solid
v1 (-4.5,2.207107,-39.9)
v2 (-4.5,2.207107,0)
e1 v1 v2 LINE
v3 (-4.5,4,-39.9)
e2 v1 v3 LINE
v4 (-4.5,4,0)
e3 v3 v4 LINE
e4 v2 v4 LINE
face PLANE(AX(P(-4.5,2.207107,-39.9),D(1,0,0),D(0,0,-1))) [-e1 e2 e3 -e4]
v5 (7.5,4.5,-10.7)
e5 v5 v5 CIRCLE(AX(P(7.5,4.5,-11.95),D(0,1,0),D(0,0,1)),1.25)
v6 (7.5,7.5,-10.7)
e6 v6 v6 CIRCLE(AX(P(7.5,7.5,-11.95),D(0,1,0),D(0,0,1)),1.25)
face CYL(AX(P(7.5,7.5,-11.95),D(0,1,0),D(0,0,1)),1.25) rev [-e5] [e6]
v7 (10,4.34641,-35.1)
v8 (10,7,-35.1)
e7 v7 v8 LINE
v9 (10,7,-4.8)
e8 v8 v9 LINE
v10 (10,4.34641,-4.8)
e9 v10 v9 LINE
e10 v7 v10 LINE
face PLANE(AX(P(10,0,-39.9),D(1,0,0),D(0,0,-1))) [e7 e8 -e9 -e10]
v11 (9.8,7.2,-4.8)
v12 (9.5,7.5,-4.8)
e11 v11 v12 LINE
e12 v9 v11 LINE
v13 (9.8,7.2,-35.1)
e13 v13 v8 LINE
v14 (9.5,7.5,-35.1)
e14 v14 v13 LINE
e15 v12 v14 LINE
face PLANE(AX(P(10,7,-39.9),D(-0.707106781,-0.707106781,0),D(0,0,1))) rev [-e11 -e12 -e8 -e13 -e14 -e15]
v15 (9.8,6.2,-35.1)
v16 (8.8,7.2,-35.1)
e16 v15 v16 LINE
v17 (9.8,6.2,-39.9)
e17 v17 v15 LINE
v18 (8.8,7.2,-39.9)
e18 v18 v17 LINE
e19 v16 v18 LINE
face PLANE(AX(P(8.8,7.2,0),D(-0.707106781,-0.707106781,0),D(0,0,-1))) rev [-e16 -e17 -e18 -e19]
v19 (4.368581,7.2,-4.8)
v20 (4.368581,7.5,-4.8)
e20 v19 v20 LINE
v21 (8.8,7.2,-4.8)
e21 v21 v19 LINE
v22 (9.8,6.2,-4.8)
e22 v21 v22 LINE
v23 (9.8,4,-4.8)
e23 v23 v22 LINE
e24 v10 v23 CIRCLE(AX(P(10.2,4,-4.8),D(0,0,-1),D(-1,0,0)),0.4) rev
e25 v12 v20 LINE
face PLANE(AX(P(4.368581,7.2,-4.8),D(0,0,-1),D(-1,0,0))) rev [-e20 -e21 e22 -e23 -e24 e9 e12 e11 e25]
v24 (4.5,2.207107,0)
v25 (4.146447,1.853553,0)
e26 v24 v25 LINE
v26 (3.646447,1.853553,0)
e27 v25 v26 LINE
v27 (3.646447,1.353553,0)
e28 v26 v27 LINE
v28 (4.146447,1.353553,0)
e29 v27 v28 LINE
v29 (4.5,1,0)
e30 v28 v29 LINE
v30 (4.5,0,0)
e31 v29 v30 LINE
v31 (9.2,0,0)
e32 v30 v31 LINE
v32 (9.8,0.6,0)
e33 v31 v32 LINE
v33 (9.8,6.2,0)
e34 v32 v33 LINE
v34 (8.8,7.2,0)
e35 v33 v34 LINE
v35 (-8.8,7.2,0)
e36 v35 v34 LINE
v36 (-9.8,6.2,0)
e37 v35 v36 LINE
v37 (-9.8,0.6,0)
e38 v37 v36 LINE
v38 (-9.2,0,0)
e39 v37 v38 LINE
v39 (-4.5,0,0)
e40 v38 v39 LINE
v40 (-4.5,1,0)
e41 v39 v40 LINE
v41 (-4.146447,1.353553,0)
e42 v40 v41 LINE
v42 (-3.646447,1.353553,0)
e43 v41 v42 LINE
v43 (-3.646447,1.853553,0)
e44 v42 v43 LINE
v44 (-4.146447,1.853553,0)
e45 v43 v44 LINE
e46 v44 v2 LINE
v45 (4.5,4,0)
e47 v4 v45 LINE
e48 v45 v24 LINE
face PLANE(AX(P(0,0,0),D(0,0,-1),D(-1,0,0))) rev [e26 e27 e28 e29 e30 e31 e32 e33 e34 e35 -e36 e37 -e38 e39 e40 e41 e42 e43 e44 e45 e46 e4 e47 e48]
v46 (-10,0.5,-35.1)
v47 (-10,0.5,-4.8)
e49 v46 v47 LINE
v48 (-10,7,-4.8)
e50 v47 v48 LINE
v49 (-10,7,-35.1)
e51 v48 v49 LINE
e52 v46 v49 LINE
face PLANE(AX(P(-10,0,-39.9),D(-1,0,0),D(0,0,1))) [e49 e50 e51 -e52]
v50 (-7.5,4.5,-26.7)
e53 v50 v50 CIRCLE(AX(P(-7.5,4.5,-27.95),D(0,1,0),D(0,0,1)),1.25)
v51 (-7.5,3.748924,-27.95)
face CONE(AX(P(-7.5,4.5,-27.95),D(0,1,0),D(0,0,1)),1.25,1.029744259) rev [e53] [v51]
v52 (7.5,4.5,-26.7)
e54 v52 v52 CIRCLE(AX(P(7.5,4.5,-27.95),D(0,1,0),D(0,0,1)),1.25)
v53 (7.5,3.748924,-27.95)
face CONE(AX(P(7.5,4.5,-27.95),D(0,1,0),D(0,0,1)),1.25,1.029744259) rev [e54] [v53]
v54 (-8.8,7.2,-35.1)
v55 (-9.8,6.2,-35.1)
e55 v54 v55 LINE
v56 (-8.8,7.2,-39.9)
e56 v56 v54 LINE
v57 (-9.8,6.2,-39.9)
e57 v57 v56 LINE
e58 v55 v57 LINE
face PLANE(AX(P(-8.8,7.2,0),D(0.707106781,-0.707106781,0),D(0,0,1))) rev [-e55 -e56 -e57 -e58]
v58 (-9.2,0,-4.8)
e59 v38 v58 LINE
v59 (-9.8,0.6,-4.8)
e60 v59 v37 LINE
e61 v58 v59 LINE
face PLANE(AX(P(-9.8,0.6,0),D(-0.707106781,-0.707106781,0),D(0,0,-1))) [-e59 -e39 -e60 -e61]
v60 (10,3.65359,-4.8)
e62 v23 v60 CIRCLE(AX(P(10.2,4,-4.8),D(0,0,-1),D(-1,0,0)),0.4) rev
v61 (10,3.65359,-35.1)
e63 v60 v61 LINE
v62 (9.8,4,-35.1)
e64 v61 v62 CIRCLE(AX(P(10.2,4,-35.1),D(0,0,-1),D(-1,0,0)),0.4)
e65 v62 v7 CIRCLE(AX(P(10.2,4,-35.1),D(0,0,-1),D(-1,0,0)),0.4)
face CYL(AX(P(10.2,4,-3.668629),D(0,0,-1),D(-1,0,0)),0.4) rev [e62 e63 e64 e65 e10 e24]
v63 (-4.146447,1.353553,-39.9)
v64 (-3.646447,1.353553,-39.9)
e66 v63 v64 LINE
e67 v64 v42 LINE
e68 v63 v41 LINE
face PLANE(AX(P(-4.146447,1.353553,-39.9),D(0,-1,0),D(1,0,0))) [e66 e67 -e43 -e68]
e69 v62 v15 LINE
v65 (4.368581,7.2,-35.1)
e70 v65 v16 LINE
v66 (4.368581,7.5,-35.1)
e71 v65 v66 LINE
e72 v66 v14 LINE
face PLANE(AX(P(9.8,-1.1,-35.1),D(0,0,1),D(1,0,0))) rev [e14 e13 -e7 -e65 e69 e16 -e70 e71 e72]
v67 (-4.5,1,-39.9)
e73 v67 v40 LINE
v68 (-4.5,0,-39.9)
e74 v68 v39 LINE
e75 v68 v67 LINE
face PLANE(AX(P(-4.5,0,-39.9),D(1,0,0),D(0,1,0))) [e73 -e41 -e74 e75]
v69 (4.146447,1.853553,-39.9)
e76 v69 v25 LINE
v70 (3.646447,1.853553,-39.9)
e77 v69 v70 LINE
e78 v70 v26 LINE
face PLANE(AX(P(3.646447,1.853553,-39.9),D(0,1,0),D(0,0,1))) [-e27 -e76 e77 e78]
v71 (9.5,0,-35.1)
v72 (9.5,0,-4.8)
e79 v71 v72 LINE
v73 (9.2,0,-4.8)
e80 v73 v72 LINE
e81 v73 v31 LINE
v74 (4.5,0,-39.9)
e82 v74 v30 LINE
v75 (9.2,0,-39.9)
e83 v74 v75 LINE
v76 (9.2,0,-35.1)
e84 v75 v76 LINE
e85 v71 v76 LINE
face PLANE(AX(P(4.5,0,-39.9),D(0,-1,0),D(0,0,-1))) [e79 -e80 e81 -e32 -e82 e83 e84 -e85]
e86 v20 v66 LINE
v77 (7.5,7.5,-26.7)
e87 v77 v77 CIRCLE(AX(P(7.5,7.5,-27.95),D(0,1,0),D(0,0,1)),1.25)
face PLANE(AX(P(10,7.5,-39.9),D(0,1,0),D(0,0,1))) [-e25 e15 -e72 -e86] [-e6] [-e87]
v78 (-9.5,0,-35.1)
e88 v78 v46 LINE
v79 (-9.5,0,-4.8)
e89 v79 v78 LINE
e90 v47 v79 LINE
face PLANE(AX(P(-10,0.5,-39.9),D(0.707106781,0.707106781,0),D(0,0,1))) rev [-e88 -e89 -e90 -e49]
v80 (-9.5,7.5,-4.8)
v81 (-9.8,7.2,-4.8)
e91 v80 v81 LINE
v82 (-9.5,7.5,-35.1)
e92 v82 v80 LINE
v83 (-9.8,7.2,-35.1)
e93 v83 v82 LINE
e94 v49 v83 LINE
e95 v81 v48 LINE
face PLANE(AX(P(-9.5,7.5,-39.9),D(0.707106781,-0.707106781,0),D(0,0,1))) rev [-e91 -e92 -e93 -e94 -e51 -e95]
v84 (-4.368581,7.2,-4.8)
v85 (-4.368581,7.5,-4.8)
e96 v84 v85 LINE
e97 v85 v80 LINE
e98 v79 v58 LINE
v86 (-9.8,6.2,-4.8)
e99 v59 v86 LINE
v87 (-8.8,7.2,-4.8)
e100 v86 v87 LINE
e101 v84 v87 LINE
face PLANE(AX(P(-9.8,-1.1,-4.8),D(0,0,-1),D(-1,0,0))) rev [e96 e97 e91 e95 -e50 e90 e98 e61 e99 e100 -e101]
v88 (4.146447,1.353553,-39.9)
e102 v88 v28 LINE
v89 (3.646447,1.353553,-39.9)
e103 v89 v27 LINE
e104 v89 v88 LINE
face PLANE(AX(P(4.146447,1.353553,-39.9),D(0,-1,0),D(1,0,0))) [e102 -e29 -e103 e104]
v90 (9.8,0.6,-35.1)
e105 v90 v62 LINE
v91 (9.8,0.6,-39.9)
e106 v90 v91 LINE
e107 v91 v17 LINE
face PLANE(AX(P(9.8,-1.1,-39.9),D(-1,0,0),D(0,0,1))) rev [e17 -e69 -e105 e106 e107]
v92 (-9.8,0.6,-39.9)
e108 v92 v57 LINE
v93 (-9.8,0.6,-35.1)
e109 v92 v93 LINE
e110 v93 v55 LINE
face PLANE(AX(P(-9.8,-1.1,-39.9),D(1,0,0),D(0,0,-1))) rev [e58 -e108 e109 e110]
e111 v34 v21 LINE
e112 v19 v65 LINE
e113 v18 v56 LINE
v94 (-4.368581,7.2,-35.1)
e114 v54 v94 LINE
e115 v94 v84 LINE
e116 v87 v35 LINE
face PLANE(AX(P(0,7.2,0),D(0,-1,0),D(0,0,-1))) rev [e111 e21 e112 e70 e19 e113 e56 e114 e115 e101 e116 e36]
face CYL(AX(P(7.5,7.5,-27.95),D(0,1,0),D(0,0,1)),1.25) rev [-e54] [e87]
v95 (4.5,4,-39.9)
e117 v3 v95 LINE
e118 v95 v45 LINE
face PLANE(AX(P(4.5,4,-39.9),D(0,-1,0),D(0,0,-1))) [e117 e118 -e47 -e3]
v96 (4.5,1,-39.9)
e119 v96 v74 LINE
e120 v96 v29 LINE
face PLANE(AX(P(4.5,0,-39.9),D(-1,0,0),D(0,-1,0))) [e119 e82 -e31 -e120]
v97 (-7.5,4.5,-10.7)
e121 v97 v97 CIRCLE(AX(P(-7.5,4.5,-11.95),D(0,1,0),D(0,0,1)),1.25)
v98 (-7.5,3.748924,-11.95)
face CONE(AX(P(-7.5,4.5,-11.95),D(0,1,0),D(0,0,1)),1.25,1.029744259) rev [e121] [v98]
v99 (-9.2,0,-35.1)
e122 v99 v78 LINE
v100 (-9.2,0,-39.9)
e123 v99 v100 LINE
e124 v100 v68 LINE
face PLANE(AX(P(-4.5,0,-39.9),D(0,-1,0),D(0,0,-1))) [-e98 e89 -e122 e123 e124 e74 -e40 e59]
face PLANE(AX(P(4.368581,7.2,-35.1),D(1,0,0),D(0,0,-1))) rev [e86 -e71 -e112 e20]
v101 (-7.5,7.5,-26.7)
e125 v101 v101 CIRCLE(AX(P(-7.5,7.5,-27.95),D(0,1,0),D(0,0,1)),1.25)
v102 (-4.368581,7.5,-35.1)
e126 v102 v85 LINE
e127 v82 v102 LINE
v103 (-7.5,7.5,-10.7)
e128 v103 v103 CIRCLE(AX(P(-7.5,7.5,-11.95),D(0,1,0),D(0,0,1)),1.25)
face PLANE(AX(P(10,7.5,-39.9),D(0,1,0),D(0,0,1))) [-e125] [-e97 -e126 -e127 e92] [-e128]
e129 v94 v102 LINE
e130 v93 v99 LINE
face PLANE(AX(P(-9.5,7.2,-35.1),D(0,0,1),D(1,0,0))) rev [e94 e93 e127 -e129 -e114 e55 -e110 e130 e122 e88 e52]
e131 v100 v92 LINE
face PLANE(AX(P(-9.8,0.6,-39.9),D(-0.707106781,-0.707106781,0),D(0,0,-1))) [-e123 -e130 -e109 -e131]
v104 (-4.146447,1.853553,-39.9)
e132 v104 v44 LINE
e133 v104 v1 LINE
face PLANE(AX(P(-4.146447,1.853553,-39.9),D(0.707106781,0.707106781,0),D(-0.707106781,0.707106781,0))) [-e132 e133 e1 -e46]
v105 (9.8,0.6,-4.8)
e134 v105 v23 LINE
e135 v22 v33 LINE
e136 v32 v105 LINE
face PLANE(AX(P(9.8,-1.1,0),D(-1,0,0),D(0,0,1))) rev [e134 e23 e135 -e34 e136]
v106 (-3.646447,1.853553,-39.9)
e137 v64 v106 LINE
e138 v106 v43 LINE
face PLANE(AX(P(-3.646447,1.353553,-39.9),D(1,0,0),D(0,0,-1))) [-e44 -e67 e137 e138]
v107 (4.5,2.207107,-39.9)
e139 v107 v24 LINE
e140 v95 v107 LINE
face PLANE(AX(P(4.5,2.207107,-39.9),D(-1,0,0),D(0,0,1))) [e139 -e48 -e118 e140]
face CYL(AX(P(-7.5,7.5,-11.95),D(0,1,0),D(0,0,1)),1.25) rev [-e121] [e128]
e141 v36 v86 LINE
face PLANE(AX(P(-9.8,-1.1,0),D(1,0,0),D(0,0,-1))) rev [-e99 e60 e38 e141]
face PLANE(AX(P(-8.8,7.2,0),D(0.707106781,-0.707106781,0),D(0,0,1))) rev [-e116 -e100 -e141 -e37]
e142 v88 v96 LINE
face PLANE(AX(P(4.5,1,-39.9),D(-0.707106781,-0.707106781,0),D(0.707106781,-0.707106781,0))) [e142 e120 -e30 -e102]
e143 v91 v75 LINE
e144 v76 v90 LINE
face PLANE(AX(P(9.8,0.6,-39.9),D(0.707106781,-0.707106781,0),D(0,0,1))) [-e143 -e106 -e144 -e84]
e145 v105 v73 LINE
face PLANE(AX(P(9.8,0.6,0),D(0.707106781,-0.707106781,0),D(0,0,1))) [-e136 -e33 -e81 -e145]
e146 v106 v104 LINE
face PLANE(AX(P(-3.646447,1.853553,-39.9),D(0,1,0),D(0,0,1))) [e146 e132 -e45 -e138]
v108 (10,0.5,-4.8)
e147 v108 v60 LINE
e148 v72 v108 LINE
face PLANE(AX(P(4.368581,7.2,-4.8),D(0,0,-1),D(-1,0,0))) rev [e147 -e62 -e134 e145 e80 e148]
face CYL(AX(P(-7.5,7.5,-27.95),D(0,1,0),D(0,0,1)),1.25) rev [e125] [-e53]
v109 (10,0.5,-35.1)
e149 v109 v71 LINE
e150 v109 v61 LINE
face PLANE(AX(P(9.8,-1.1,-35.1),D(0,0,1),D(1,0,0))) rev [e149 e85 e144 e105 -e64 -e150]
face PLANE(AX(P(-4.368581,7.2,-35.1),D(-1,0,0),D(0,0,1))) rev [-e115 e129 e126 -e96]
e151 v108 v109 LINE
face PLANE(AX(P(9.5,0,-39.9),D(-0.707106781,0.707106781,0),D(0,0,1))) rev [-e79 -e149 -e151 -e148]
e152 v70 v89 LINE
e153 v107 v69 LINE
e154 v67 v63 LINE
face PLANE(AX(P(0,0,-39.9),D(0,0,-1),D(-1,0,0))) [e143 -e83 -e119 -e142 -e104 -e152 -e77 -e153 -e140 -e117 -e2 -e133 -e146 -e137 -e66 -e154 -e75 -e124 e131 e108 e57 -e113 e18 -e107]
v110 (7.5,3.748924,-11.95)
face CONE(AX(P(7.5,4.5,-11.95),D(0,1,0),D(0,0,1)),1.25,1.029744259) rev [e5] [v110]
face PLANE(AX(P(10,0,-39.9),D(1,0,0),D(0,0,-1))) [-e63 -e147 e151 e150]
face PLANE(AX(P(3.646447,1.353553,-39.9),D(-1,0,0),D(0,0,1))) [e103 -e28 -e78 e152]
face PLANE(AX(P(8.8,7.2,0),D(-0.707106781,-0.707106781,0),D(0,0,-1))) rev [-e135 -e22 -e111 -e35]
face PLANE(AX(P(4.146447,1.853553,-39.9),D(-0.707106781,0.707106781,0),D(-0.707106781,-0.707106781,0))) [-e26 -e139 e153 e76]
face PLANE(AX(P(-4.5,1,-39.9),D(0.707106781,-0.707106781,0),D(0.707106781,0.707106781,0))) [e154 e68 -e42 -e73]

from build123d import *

# Parameters (mm, degrees)
EXTRUDE_1_DEPTH     = 39.9
CHAMFER_1_SIZE      = 0.5
CUT_EXTRUDE_1_DEPTH = 0.3
SKETCH_6_W          = 0.2
SKETCH_6_H          = 4.8
CUT_EXTRUDE_2_DEPTH = 8.3
CHAMFER_2_SIZE      = 1
CHAMFER_3_SIZE      = 0.6
CHAMFER_4_SIZE      = 0.5
SKETCH_7_R          = 0.4
CUT_EXTRUDE_3_DEPTH = 30.3


with BuildPart() as part:
    # 草图1 → 凸台-拉伸1 (new body)
    with BuildSketch(Plane.XY):
        Polygon((-10, 0), (-10, 7.5), (10, 7.5), (10, 0), (4.5, 0), (4.5, 1), (4.146446609, 1.353553391), (3.646446609, 1.353553391), (3.646446609, 1.853553391), (4.146446609, 1.853553391), (4.5, 2.207106781), (4.5, 4), (-4.5, 4), (-4.5, 2.207106781), (-4.146446609, 1.853553391), (-3.646446609, 1.853553391), (-3.646446609, 1.353553391), (-4.146446609, 1.353553391), (-4.5, 1), (-4.5, 0), align=None)
    extrude(amount=-EXTRUDE_1_DEPTH)

    # 草图3 → M3 螺纹孔1 (revolve, cut)
    with BuildSketch(Plane(origin=(7.5, 7.5, -27.95), x_dir=(0, 0, 1), z_dir=(1, 0, 0))):
        Polygon((0, 0), (0, 3.751075774), (1.25, 3), (1.25, 0), align=None)
    hole_wizard_m3_1 = revolve(axis=Axis((7.5, 13.85, -27.95), (0, -1, 0)), mode=Mode.SUBTRACT)

    # 镜向1: M3 螺纹孔1 across plane
    add(hole_wizard_m3_1.mirror(Plane(origin=(0, 0, -19.95), x_dir=(1, 0, 0), z_dir=(0, 0, -1))), mode=Mode.SUBTRACT)

    # 镜向2: M3 螺纹孔1 across plane
    add(hole_wizard_m3_1.mirror(Plane.ZY), mode=Mode.SUBTRACT)

    # 镜向2 copy 1 sketch → 镜向2 copy 1 (revolve, cut)
    with BuildSketch(Plane(origin=(-7.5, 7.5, -11.95), x_dir=(0, 0, -1), z_dir=(-1, 0, 0))):
        Polygon((0, 0), (0, 3.751075774), (1.25, 3), (1.25, 0), align=None)
    revolve(axis=Axis((-7.5, 13.85, -11.95), (0, -1, 0)), mode=Mode.SUBTRACT)

    # 倒角1
    chamfer_1_edges = [part.edges().sort_by_distance(p)[0] for p in [
        (10, 7.5, -19.95),
        (-10, 7.5, -19.95),
    ]]
    chamfer(chamfer_1_edges, length=CHAMFER_1_SIZE)

    # 草图5 → 切除-拉伸1 (cut)
    with BuildSketch(Plane(origin=(0, 7.5, 0), x_dir=(1, 0, 0), z_dir=(0, 1, 0))):
        Polygon((-9.5, 35.1), (-4.368581018, 35.1), (-4.368581018, 4.8), (-9.5, 4.8), (-10, 4.8), (-10, 0), (10, 0), (10, 4.8), (9.5, 4.8), (4.368581018, 4.8), (4.368581018, 35.1), (9.5, 35.1), (10, 35.1), (10, 39.9), (-10, 39.9), (-10, 35.1), align=None)
    extrude(amount=-CUT_EXTRUDE_1_DEPTH, mode=Mode.SUBTRACT)

    # 草图6 → 切除-拉伸2 (cut)
    with BuildSketch(Plane(origin=(0, 7.2, 0), x_dir=(1, 0, 0), z_dir=(0, 1, 0))):
        with Locations((-9.9, 37.5)):
            Rectangle(SKETCH_6_W, SKETCH_6_H)
        with Locations((9.9, 37.5)):
            Rectangle(SKETCH_6_W, SKETCH_6_H)
        with Locations((9.9, 2.4)):
            Rectangle(SKETCH_6_W, SKETCH_6_H)
        with Locations((-9.9, 2.4)):
            Rectangle(SKETCH_6_W, SKETCH_6_H)
    extrude(amount=-CUT_EXTRUDE_2_DEPTH, mode=Mode.SUBTRACT)

    # 倒角2
    # the kernel refuses this chamfer: 1 mm, written as the material it takes off along each edge
    with BuildSketch(Plane(origin=(-9.8, 7.2, -4.8), x_dir=(-0.027495876610583895, -0.9996219169112968, 0), z_dir=(0, 0, 1)), Plane(origin=(-9.8, 7.2, -42.471682988), x_dir=(-0.027495876610585623, -0.9996219169112968, 0), z_dir=(0, 0, 1))) as chamfer_2_piece_1:
        Polygon((CHAMFER_2_SIZE * 0.999621916911, CHAMFER_2_SIZE * 0.0274958766106), (-CHAMFER_2_SIZE * 0.0274958766106, CHAMFER_2_SIZE * 0.999621916911), (0, 0), align=None)
    extrude(amount=7.371682988, mode=Mode.SUBTRACT)
    with BuildSketch(Plane(origin=(9.8, 7.2, 2.571682988), x_dir=(-0.9996219169112968, 0.02749587661058651, 0), z_dir=(0, 0, -1)), Plane(origin=(9.8, 7.2, -35.1), x_dir=(-0.9996219169112968, 0.02749587661058651, 0), z_dir=(0, 0, -1))) as chamfer_2_piece_2:
        Polygon((CHAMFER_2_SIZE * 0.999621916911, -CHAMFER_2_SIZE * 0.0274958766106), (-CHAMFER_2_SIZE * 0.0274958766106, -CHAMFER_2_SIZE * 0.999621916911), (0, 0), align=None)
    extrude(amount=7.371682988, mode=Mode.SUBTRACT)

    # 倒角3
    chamfer_3_edges = [part.edges().sort_by_distance(p)[0] for p in [
        (-9.8, 0, -37.5),
        (9.8, 0, -37.5),
        (9.8, 0, -2.4),
        (-9.8, 0, -2.4),
    ]]
    chamfer(chamfer_3_edges, length=CHAMFER_3_SIZE)

    # 倒角4
    chamfer_4_edges = [part.edges().sort_by_distance(p)[0] for p in [
        (-10, 0, -19.95),
        (10, 0, -19.95),
    ]]
    chamfer(chamfer_4_edges, length=CHAMFER_4_SIZE)

    # 草图7 → 切除-拉伸3 (cut)
    with BuildSketch(Plane(origin=(0, 0, -35.1), x_dir=(-1, 0, 0), z_dir=(0, 0, -1))):
        with Locations((-10.2, 4)):
            Circle(SKETCH_7_R)
    extrude(amount=-CUT_EXTRUDE_3_DEPTH, mode=Mode.SUBTRACT)


solid = part.part
